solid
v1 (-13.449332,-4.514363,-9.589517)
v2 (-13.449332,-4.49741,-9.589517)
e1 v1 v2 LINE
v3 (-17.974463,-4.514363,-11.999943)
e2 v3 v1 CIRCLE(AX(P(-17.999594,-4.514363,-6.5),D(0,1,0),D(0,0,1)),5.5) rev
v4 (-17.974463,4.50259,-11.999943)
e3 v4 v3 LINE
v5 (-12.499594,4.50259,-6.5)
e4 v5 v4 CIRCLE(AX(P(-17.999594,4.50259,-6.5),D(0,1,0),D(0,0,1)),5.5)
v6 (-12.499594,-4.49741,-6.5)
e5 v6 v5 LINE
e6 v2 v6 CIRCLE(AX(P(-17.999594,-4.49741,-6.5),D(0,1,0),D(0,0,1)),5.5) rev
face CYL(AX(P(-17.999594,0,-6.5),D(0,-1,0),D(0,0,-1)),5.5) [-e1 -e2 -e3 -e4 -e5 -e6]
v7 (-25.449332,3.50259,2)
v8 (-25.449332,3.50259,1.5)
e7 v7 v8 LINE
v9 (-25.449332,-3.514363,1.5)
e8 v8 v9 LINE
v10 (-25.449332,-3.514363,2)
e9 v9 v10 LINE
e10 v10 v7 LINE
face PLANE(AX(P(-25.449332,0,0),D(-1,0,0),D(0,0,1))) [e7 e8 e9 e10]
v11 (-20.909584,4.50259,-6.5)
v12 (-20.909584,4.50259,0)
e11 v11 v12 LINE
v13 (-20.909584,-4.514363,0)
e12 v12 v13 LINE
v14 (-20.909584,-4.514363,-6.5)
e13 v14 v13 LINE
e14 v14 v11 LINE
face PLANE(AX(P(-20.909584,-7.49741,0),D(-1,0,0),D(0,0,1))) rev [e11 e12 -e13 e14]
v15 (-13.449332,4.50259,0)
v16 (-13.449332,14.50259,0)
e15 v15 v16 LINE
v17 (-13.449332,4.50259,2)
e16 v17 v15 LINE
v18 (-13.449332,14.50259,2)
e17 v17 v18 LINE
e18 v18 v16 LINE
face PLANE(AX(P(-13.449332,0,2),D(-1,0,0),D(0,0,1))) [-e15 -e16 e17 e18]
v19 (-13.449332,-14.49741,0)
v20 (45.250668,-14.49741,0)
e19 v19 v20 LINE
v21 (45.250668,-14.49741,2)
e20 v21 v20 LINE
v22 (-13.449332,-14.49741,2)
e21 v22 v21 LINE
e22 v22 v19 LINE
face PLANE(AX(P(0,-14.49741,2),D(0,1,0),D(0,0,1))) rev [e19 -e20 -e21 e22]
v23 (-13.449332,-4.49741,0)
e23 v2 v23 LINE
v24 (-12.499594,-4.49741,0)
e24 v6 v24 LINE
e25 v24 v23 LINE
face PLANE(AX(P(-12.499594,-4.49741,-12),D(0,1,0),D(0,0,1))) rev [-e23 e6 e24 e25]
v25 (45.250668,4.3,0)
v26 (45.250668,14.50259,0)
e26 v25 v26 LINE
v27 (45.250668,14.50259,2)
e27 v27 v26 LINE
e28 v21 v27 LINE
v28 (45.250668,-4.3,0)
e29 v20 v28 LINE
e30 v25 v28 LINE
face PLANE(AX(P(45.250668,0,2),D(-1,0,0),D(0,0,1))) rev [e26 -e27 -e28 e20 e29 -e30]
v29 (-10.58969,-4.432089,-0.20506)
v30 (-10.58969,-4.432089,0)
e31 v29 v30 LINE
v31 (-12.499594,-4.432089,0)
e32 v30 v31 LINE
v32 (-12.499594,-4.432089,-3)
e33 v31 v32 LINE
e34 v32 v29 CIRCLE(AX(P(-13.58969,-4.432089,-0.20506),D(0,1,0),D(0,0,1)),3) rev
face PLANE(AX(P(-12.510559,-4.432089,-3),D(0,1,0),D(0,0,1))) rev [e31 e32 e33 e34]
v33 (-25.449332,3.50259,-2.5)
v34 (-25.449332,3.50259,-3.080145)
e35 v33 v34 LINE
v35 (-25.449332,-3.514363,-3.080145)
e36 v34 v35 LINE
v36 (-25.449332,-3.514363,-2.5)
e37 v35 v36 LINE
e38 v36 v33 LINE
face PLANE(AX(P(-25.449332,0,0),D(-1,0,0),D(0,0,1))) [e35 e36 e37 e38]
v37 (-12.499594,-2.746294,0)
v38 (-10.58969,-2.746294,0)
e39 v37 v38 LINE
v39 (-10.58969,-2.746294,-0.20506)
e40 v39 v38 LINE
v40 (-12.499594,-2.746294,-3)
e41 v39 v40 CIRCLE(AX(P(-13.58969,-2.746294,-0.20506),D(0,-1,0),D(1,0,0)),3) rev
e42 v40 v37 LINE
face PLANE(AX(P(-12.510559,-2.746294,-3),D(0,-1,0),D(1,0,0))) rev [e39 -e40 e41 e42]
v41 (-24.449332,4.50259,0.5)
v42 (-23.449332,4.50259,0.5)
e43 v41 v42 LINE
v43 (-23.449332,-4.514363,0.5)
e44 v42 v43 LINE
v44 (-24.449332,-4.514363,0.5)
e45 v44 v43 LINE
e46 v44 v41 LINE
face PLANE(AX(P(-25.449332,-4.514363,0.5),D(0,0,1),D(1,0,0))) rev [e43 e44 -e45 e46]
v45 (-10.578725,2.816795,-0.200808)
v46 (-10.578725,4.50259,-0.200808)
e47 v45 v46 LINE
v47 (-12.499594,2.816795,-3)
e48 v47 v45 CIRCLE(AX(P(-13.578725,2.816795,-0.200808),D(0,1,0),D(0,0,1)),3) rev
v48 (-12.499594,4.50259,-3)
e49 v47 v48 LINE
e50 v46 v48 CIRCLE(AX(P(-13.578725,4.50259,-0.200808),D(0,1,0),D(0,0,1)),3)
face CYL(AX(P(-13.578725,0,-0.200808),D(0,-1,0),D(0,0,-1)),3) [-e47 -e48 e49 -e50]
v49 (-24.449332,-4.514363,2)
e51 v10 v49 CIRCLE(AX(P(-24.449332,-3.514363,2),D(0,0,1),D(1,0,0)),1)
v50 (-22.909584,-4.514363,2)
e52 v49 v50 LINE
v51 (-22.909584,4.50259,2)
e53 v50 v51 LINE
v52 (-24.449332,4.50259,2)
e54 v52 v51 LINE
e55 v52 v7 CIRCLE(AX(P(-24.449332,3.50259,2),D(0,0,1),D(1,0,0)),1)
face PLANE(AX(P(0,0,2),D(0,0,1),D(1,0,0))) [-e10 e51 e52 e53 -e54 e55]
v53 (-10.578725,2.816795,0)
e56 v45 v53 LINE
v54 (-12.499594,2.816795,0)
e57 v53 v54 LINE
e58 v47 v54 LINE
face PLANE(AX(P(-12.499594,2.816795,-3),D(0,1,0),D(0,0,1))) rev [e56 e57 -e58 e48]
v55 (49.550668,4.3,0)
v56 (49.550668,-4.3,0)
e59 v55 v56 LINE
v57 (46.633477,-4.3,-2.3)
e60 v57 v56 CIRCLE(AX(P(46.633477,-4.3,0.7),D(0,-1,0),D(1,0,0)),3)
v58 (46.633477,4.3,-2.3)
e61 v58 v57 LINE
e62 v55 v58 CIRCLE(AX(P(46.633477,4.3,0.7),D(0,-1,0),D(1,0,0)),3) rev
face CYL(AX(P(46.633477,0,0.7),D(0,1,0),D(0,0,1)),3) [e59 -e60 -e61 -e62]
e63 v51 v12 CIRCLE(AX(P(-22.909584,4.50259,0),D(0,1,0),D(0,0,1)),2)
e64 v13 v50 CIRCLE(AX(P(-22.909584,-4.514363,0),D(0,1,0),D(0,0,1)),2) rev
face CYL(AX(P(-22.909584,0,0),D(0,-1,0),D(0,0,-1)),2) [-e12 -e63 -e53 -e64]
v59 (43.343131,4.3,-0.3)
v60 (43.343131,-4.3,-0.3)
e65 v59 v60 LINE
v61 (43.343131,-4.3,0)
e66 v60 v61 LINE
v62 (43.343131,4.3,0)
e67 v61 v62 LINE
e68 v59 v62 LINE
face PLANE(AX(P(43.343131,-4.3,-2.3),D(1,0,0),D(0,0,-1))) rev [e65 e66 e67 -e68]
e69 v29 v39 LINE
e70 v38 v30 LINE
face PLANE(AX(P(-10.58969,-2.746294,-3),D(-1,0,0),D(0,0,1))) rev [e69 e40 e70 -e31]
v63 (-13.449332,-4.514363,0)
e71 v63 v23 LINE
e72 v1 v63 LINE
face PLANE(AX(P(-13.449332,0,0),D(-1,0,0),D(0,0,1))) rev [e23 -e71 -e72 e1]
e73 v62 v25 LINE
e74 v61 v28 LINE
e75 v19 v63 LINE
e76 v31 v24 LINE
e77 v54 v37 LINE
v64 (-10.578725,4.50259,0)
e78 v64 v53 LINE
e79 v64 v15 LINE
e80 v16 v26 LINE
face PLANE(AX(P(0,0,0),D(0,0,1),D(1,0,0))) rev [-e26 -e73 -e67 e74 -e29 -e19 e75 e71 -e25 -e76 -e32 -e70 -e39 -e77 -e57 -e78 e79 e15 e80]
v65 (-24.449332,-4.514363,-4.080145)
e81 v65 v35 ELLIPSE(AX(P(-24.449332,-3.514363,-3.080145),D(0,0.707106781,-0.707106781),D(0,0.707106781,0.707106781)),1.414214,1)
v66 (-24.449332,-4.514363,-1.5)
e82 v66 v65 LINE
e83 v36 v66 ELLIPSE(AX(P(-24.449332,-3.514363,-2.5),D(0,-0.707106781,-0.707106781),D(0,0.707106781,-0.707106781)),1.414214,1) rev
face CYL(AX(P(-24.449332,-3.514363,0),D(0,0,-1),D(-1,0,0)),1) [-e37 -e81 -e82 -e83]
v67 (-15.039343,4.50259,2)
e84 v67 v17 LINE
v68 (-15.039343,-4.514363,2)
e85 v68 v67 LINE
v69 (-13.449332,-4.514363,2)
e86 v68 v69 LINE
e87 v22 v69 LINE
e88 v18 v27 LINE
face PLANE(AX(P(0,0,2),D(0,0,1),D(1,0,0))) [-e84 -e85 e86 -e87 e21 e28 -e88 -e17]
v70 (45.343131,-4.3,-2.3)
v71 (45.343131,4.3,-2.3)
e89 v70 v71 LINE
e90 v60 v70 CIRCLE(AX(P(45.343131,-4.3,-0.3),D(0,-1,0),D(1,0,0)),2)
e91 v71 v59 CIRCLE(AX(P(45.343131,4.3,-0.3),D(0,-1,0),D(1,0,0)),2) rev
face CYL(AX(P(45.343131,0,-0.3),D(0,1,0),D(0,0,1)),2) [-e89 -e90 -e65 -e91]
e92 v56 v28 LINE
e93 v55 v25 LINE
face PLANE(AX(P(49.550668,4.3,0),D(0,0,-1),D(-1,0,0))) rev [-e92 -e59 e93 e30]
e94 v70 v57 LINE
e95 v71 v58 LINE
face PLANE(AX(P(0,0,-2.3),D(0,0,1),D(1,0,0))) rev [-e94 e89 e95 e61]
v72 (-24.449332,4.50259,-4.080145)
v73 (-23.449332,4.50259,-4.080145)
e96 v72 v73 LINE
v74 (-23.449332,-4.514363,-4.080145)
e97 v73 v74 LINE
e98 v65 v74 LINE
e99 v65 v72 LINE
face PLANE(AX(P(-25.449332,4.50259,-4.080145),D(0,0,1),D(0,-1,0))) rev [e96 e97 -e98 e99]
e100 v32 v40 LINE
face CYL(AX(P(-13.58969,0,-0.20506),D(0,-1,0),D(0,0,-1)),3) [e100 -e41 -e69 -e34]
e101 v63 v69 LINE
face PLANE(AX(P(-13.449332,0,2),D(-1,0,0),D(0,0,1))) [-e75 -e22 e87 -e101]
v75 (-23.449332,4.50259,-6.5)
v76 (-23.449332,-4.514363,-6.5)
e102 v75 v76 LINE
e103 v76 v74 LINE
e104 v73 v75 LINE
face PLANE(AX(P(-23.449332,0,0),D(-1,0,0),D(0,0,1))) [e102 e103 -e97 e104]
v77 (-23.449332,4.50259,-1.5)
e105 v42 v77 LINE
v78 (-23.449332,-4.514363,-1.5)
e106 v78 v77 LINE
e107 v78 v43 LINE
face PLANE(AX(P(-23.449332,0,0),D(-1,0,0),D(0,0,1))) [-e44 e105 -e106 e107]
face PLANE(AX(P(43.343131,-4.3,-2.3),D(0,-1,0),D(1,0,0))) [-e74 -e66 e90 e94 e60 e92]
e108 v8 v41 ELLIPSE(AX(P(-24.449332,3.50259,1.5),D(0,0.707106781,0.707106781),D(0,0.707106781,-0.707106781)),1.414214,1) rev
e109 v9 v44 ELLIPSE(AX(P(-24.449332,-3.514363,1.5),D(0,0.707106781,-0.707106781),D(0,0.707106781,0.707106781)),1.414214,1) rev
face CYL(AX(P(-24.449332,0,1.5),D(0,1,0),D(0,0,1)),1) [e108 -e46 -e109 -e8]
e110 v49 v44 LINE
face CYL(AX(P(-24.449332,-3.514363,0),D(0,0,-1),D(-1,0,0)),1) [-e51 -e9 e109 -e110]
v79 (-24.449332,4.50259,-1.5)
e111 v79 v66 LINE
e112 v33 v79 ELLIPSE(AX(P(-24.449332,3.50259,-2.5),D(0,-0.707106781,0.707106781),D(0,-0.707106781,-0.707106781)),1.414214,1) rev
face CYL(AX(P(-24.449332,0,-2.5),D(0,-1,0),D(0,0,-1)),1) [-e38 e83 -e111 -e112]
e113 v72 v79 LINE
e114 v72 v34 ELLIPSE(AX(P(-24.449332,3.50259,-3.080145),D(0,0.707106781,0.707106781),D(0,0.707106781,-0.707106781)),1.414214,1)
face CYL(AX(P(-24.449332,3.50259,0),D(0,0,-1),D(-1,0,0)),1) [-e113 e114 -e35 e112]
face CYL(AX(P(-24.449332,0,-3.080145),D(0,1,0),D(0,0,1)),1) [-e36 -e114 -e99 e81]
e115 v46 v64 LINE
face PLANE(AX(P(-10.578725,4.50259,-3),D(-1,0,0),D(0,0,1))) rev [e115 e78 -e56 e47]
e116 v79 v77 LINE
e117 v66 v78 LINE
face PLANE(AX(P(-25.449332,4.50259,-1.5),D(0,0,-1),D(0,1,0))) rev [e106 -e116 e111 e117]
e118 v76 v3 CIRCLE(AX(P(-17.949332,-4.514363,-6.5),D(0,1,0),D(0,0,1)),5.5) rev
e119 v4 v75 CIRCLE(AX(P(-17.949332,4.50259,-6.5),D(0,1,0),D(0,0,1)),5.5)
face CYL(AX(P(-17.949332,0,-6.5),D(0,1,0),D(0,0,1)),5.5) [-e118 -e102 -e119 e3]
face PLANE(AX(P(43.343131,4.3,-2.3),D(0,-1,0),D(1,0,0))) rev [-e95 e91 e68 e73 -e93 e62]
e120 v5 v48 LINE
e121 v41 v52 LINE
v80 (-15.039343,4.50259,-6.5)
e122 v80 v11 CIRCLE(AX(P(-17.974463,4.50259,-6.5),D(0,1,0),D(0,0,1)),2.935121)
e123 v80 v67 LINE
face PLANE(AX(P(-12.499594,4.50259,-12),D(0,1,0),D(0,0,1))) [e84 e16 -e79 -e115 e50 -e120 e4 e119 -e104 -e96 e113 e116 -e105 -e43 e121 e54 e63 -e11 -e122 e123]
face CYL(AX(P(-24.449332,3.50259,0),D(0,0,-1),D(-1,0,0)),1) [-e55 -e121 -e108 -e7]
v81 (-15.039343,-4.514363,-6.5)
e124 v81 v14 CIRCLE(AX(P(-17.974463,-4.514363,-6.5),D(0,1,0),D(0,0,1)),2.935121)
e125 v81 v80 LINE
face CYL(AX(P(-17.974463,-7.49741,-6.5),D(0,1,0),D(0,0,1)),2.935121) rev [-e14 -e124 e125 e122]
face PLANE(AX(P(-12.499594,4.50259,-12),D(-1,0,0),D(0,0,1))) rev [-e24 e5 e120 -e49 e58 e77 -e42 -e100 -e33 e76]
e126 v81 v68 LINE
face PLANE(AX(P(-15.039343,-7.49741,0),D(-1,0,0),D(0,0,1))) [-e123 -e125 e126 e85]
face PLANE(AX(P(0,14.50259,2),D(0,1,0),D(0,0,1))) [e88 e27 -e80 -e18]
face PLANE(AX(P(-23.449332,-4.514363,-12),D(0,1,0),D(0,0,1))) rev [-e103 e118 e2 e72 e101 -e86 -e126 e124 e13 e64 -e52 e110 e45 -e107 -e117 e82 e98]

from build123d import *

# Parameters (mm, degrees)
SKETCH1_W           = 58.7
SKETCH1_H           = 14.5
BOSS_EXTRUDE1_DEPTH = 2
SKETCH2_W           = 1.907537222
SKETCH2_H           = 8.6
BOSS_EXTRUDE2_DEPTH = 4.3
SKETCH3_W           = 2.3
SKETCH3_H           = 8.6
BOSS_EXTRUDE3_DEPTH = 4.3
FILLET3_R           = 2
SKETCH4_W           = 0.949738238
SKETCH4_H           = 9
BOSS_EXTRUDE4_DEPTH = 12
SKETCH5_W           = 14
SKETCH5_H           = 9.016953004
BOSS_EXTRUDE5_DEPTH = 10
FILLET4_R           = 5.5
CUT_EXTRUDE1_DEPTH  = 12
SKETCH8_W           = 2.580145407
SKETCH8_H           = 9.016953004
SKETCH8_W_2         = 1.5
BOSS_EXTRUDE6_DEPTH = 2
SKETCH9_W           = 1.920869139
SKETCH9_H           = 1.685794619
SKETCH9_H_2         = 1.68579462
BOSS_EXTRUDE7_DEPTH = 3
FILLET6_R           = 3
FILLET9_R           = 3
FILLET11_R          = 1
FILLET12_R          = 1
FILLET13_R          = 2


with BuildPart() as part:
    # Sketch1 → Boss-Extrude1 (new body)
    with BuildSketch(Plane.XY):
        with Locations((15.900667763, -7.24741023)):
            Rectangle(SKETCH1_W, SKETCH1_H)
        with Locations((15.900667763, 7.25258977)):
            Rectangle(SKETCH1_W, SKETCH1_H)
    extrude(amount=BOSS_EXTRUDE1_DEPTH)

    # Sketch2 → Boss-Extrude2 (add)
    with BuildSketch(Plane.XY.offset(2)):
        with Locations((44.296899152, 0)):
            Rectangle(SKETCH2_W, SKETCH2_H)
    extrude(amount=-BOSS_EXTRUDE2_DEPTH)

    # Sketch3 → Boss-Extrude3 (add)
    with BuildSketch(Plane(origin=(45.250667763, 0, 0), x_dir=(0, 0, -1), z_dir=(1, 0, 0))):
        with Locations((1.15, 0)):
            Rectangle(SKETCH3_W, SKETCH3_H)
    extrude(amount=BOSS_EXTRUDE3_DEPTH)

    # Fillet3
    fillet3_edges = [part.edges().sort_by_distance(p)[0] for p in [
        (43.343130541, 0, -2.3),
    ]]
    fillet(fillet3_edges, radius=FILLET3_R)

    # Sketch4 → Boss-Extrude4 (add)
    with BuildSketch(Plane(origin=(0, 0, 0), x_dir=(-1, 0, 0), z_dir=(0, 0, -1))):
        with Locations((12.974463118, 0.00258977)):
            Rectangle(SKETCH4_W, SKETCH4_H)
    extrude(amount=BOSS_EXTRUDE4_DEPTH)

    # Sketch5 → Boss-Extrude5 (add)
    with BuildSketch(Plane.ZY.offset(13.449332237)):
        with Locations((-5, -0.005886732)):
            Rectangle(SKETCH5_W, SKETCH5_H)
    extrude(amount=BOSS_EXTRUDE5_DEPTH)

    # Fillet4
    # the kernel refuses this fillet: 5.5 mm, written as the material it takes off along each edge
    with BuildSketch(Plane(origin=(-23.449332237, -18.264363234, -12), x_dir=(1, 0, 0), z_dir=(0, 1, 0))) as fillet4_piece_1:
        with BuildLine():
            CenterArc((FILLET4_R, -FILLET4_R), FILLET4_R, 90, 90)
            Line((0, -FILLET4_R), (0, 0))
            Line((0, 0), (FILLET4_R, 0))
        make_face()
    extrude(amount=36.516953004, mode=Mode.SUBTRACT)
    with BuildSketch(Plane(origin=(-12.499593999, -18.24741023, -12), x_dir=(-1, 0, 0), z_dir=(0, 1, 0))) as fillet4_piece_2:
        with BuildLine():
            CenterArc((FILLET4_R, FILLET4_R), FILLET4_R, 180, 90)
            Line((0, FILLET4_R), (0, 0))
            Line((0, 0), (FILLET4_R, 0))
        make_face()
    extrude(amount=36.5, mode=Mode.SUBTRACT)

    # Sketch7 → Cut-Extrude1 (cut)
    with BuildSketch(Plane(origin=(0, 4.50258977, 0), x_dir=(1, 0, 0), z_dir=(0, 1, 0))):
        with BuildLine():
            ThreePointArc((-15.03934254, 6.5), (-17.974463118, 9.435120578), (-20.909583696, 6.5))
            Line((-20.909583696, 6.5), (-15.03934254, 6.5))
        make_face()
        with BuildLine():
            Line((-15.03934254, 6.5), (-20.909583696, 6.5))
            ThreePointArc((-20.909583696, 6.5), (-17.974463118, 3.564879422), (-15.03934254, 6.5))
        make_face()
        with BuildLine():
            ThreePointArc((-15.03934254, 6.5), (-17.974463118, 3.564879422), (-20.909583696, 6.5))
            Line((-20.909583696, 6.5), (-20.909583696, -2))
            Line((-20.909583696, -2), (-15.03934254, -2))
            Line((-15.03934254, -2), (-15.03934254, 6.5))
        make_face()
    extrude(amount=-CUT_EXTRUDE1_DEPTH, mode=Mode.SUBTRACT)

    # Sketch8 → Boss-Extrude6 (add)
    with BuildSketch(Plane.ZY.offset(23.449332237)):
        with Locations((-2.790072703, -0.005886732)):
            Rectangle(SKETCH8_W, SKETCH8_H)
        with Locations((1.25, -0.005886732)):
            Rectangle(SKETCH8_W_2, SKETCH8_H)
    extrude(amount=BOSS_EXTRUDE6_DEPTH)

    # Sketch9 → Boss-Extrude7 (add)
    with BuildSketch(Plane(origin=(0, 0, 0), x_dir=(-1, 0, 0), z_dir=(0, 0, -1))):
        with Locations((11.550124457, -3.589191377)):
            Rectangle(SKETCH9_W, SKETCH9_H)
        with Locations((11.539159429, 3.65969246)):
            Rectangle(SKETCH9_W, SKETCH9_H_2)
    extrude(amount=BOSS_EXTRUDE7_DEPTH)

    # Fillet6
    # the kernel refuses this fillet: 3 mm, written as the material it takes off along each edge
    with BuildSketch(Plane(origin=(-10.589689887, 4.241056538, -3), x_dir=(-1, 0, 0), z_dir=(0, -1, 0))) as fillet6_piece_1_section:
        with BuildLine():
            CenterArc((3, -2.794940242), FILLET6_R, 111.307014795, 68.692985205)
            Line((0, -2.794940242), (0, 0))
            Line((0, 0), (1.909904112, 0))
        make_face()
    fillet6_piece_1 = extrude(amount=15.660495829, mode=Mode.PRIVATE)
    fillet6_piece_1 = split(fillet6_piece_1, bisect_by=Plane(origin=(-11.107813793, 2.81679515, -1.901033535), z_dir=(0, -1, 0)), keep=Keep.TOP, mode=Mode.PRIVATE)
    add(fillet6_piece_1, mode=Mode.SUBTRACT)
    with BuildSketch(Plane(origin=(-10.57872486, 11.500570097, -3), x_dir=(-1, 0, 0), z_dir=(0, -1, 0))) as fillet6_piece_2:
        with BuildLine():
            CenterArc((3, -2.799192131), FILLET6_R, 111.082404826, 68.917595174)
            Line((0, -2.799192131), (0, 0))
            Line((0, 0), (1.920869139, 0))
        make_face()
    extrude(amount=15.681755273, mode=Mode.SUBTRACT)

    # Fillet9
    # the kernel refuses this fillet: 3 mm, written as the material it takes off along each edge
    with BuildSketch(Plane(origin=(49.550667763, 11.592976073, -2.3), x_dir=(-1, 0, 0), z_dir=(0, -1, 0))) as fillet9_piece_1:
        with BuildLine():
            CenterArc((2.917190429, -3), FILLET9_R, 90, 76.506601178)
            Line((0, -2.3), (-0.058343809, -2.286))
            ThreePointArc((-0.058343809, -2.286), (-0.06, -1.15), (-0.06, 0))
            Line((-0.06, 0), (0, 0.06))
            Line((0, 0.06), (2.917190429, 0.06))
            Line((2.917190429, 0.06), (2.917190429, 0))
        make_face()
    extrude(amount=23.185952146, mode=Mode.SUBTRACT)

    # Fillet11
    fillet11_edges = [part.edges().sort_by_distance(p)[0] for p in [
        (-25.449332237, -0.005886732, -4.080145407),
        (-25.449332237, -4.514363234, -2.790072704),
        (-25.449332237, -0.005886732, -1.5),
        (-25.449332237, 4.50258977, -2.790072704),
    ]]
    fillet(fillet11_edges, radius=FILLET11_R)

    # Fillet12
    fillet12_edges = [part.edges().sort_by_distance(p)[0] for p in [
        (-25.449332237, 4.50258977, 1.25),
        (-25.449332237, -0.005886732, 0.5),
        (-25.449332237, -4.514363234, 1.25),
    ]]
    fillet(fillet12_edges, radius=FILLET12_R)

    # Fillet13
    fillet13_edges = [part.edges().sort_by_distance(p)[0] for p in [
        (-20.909583696, -0.005886732, 2),
    ]]
    fillet(fillet13_edges, radius=FILLET13_R)


solid = part.part
